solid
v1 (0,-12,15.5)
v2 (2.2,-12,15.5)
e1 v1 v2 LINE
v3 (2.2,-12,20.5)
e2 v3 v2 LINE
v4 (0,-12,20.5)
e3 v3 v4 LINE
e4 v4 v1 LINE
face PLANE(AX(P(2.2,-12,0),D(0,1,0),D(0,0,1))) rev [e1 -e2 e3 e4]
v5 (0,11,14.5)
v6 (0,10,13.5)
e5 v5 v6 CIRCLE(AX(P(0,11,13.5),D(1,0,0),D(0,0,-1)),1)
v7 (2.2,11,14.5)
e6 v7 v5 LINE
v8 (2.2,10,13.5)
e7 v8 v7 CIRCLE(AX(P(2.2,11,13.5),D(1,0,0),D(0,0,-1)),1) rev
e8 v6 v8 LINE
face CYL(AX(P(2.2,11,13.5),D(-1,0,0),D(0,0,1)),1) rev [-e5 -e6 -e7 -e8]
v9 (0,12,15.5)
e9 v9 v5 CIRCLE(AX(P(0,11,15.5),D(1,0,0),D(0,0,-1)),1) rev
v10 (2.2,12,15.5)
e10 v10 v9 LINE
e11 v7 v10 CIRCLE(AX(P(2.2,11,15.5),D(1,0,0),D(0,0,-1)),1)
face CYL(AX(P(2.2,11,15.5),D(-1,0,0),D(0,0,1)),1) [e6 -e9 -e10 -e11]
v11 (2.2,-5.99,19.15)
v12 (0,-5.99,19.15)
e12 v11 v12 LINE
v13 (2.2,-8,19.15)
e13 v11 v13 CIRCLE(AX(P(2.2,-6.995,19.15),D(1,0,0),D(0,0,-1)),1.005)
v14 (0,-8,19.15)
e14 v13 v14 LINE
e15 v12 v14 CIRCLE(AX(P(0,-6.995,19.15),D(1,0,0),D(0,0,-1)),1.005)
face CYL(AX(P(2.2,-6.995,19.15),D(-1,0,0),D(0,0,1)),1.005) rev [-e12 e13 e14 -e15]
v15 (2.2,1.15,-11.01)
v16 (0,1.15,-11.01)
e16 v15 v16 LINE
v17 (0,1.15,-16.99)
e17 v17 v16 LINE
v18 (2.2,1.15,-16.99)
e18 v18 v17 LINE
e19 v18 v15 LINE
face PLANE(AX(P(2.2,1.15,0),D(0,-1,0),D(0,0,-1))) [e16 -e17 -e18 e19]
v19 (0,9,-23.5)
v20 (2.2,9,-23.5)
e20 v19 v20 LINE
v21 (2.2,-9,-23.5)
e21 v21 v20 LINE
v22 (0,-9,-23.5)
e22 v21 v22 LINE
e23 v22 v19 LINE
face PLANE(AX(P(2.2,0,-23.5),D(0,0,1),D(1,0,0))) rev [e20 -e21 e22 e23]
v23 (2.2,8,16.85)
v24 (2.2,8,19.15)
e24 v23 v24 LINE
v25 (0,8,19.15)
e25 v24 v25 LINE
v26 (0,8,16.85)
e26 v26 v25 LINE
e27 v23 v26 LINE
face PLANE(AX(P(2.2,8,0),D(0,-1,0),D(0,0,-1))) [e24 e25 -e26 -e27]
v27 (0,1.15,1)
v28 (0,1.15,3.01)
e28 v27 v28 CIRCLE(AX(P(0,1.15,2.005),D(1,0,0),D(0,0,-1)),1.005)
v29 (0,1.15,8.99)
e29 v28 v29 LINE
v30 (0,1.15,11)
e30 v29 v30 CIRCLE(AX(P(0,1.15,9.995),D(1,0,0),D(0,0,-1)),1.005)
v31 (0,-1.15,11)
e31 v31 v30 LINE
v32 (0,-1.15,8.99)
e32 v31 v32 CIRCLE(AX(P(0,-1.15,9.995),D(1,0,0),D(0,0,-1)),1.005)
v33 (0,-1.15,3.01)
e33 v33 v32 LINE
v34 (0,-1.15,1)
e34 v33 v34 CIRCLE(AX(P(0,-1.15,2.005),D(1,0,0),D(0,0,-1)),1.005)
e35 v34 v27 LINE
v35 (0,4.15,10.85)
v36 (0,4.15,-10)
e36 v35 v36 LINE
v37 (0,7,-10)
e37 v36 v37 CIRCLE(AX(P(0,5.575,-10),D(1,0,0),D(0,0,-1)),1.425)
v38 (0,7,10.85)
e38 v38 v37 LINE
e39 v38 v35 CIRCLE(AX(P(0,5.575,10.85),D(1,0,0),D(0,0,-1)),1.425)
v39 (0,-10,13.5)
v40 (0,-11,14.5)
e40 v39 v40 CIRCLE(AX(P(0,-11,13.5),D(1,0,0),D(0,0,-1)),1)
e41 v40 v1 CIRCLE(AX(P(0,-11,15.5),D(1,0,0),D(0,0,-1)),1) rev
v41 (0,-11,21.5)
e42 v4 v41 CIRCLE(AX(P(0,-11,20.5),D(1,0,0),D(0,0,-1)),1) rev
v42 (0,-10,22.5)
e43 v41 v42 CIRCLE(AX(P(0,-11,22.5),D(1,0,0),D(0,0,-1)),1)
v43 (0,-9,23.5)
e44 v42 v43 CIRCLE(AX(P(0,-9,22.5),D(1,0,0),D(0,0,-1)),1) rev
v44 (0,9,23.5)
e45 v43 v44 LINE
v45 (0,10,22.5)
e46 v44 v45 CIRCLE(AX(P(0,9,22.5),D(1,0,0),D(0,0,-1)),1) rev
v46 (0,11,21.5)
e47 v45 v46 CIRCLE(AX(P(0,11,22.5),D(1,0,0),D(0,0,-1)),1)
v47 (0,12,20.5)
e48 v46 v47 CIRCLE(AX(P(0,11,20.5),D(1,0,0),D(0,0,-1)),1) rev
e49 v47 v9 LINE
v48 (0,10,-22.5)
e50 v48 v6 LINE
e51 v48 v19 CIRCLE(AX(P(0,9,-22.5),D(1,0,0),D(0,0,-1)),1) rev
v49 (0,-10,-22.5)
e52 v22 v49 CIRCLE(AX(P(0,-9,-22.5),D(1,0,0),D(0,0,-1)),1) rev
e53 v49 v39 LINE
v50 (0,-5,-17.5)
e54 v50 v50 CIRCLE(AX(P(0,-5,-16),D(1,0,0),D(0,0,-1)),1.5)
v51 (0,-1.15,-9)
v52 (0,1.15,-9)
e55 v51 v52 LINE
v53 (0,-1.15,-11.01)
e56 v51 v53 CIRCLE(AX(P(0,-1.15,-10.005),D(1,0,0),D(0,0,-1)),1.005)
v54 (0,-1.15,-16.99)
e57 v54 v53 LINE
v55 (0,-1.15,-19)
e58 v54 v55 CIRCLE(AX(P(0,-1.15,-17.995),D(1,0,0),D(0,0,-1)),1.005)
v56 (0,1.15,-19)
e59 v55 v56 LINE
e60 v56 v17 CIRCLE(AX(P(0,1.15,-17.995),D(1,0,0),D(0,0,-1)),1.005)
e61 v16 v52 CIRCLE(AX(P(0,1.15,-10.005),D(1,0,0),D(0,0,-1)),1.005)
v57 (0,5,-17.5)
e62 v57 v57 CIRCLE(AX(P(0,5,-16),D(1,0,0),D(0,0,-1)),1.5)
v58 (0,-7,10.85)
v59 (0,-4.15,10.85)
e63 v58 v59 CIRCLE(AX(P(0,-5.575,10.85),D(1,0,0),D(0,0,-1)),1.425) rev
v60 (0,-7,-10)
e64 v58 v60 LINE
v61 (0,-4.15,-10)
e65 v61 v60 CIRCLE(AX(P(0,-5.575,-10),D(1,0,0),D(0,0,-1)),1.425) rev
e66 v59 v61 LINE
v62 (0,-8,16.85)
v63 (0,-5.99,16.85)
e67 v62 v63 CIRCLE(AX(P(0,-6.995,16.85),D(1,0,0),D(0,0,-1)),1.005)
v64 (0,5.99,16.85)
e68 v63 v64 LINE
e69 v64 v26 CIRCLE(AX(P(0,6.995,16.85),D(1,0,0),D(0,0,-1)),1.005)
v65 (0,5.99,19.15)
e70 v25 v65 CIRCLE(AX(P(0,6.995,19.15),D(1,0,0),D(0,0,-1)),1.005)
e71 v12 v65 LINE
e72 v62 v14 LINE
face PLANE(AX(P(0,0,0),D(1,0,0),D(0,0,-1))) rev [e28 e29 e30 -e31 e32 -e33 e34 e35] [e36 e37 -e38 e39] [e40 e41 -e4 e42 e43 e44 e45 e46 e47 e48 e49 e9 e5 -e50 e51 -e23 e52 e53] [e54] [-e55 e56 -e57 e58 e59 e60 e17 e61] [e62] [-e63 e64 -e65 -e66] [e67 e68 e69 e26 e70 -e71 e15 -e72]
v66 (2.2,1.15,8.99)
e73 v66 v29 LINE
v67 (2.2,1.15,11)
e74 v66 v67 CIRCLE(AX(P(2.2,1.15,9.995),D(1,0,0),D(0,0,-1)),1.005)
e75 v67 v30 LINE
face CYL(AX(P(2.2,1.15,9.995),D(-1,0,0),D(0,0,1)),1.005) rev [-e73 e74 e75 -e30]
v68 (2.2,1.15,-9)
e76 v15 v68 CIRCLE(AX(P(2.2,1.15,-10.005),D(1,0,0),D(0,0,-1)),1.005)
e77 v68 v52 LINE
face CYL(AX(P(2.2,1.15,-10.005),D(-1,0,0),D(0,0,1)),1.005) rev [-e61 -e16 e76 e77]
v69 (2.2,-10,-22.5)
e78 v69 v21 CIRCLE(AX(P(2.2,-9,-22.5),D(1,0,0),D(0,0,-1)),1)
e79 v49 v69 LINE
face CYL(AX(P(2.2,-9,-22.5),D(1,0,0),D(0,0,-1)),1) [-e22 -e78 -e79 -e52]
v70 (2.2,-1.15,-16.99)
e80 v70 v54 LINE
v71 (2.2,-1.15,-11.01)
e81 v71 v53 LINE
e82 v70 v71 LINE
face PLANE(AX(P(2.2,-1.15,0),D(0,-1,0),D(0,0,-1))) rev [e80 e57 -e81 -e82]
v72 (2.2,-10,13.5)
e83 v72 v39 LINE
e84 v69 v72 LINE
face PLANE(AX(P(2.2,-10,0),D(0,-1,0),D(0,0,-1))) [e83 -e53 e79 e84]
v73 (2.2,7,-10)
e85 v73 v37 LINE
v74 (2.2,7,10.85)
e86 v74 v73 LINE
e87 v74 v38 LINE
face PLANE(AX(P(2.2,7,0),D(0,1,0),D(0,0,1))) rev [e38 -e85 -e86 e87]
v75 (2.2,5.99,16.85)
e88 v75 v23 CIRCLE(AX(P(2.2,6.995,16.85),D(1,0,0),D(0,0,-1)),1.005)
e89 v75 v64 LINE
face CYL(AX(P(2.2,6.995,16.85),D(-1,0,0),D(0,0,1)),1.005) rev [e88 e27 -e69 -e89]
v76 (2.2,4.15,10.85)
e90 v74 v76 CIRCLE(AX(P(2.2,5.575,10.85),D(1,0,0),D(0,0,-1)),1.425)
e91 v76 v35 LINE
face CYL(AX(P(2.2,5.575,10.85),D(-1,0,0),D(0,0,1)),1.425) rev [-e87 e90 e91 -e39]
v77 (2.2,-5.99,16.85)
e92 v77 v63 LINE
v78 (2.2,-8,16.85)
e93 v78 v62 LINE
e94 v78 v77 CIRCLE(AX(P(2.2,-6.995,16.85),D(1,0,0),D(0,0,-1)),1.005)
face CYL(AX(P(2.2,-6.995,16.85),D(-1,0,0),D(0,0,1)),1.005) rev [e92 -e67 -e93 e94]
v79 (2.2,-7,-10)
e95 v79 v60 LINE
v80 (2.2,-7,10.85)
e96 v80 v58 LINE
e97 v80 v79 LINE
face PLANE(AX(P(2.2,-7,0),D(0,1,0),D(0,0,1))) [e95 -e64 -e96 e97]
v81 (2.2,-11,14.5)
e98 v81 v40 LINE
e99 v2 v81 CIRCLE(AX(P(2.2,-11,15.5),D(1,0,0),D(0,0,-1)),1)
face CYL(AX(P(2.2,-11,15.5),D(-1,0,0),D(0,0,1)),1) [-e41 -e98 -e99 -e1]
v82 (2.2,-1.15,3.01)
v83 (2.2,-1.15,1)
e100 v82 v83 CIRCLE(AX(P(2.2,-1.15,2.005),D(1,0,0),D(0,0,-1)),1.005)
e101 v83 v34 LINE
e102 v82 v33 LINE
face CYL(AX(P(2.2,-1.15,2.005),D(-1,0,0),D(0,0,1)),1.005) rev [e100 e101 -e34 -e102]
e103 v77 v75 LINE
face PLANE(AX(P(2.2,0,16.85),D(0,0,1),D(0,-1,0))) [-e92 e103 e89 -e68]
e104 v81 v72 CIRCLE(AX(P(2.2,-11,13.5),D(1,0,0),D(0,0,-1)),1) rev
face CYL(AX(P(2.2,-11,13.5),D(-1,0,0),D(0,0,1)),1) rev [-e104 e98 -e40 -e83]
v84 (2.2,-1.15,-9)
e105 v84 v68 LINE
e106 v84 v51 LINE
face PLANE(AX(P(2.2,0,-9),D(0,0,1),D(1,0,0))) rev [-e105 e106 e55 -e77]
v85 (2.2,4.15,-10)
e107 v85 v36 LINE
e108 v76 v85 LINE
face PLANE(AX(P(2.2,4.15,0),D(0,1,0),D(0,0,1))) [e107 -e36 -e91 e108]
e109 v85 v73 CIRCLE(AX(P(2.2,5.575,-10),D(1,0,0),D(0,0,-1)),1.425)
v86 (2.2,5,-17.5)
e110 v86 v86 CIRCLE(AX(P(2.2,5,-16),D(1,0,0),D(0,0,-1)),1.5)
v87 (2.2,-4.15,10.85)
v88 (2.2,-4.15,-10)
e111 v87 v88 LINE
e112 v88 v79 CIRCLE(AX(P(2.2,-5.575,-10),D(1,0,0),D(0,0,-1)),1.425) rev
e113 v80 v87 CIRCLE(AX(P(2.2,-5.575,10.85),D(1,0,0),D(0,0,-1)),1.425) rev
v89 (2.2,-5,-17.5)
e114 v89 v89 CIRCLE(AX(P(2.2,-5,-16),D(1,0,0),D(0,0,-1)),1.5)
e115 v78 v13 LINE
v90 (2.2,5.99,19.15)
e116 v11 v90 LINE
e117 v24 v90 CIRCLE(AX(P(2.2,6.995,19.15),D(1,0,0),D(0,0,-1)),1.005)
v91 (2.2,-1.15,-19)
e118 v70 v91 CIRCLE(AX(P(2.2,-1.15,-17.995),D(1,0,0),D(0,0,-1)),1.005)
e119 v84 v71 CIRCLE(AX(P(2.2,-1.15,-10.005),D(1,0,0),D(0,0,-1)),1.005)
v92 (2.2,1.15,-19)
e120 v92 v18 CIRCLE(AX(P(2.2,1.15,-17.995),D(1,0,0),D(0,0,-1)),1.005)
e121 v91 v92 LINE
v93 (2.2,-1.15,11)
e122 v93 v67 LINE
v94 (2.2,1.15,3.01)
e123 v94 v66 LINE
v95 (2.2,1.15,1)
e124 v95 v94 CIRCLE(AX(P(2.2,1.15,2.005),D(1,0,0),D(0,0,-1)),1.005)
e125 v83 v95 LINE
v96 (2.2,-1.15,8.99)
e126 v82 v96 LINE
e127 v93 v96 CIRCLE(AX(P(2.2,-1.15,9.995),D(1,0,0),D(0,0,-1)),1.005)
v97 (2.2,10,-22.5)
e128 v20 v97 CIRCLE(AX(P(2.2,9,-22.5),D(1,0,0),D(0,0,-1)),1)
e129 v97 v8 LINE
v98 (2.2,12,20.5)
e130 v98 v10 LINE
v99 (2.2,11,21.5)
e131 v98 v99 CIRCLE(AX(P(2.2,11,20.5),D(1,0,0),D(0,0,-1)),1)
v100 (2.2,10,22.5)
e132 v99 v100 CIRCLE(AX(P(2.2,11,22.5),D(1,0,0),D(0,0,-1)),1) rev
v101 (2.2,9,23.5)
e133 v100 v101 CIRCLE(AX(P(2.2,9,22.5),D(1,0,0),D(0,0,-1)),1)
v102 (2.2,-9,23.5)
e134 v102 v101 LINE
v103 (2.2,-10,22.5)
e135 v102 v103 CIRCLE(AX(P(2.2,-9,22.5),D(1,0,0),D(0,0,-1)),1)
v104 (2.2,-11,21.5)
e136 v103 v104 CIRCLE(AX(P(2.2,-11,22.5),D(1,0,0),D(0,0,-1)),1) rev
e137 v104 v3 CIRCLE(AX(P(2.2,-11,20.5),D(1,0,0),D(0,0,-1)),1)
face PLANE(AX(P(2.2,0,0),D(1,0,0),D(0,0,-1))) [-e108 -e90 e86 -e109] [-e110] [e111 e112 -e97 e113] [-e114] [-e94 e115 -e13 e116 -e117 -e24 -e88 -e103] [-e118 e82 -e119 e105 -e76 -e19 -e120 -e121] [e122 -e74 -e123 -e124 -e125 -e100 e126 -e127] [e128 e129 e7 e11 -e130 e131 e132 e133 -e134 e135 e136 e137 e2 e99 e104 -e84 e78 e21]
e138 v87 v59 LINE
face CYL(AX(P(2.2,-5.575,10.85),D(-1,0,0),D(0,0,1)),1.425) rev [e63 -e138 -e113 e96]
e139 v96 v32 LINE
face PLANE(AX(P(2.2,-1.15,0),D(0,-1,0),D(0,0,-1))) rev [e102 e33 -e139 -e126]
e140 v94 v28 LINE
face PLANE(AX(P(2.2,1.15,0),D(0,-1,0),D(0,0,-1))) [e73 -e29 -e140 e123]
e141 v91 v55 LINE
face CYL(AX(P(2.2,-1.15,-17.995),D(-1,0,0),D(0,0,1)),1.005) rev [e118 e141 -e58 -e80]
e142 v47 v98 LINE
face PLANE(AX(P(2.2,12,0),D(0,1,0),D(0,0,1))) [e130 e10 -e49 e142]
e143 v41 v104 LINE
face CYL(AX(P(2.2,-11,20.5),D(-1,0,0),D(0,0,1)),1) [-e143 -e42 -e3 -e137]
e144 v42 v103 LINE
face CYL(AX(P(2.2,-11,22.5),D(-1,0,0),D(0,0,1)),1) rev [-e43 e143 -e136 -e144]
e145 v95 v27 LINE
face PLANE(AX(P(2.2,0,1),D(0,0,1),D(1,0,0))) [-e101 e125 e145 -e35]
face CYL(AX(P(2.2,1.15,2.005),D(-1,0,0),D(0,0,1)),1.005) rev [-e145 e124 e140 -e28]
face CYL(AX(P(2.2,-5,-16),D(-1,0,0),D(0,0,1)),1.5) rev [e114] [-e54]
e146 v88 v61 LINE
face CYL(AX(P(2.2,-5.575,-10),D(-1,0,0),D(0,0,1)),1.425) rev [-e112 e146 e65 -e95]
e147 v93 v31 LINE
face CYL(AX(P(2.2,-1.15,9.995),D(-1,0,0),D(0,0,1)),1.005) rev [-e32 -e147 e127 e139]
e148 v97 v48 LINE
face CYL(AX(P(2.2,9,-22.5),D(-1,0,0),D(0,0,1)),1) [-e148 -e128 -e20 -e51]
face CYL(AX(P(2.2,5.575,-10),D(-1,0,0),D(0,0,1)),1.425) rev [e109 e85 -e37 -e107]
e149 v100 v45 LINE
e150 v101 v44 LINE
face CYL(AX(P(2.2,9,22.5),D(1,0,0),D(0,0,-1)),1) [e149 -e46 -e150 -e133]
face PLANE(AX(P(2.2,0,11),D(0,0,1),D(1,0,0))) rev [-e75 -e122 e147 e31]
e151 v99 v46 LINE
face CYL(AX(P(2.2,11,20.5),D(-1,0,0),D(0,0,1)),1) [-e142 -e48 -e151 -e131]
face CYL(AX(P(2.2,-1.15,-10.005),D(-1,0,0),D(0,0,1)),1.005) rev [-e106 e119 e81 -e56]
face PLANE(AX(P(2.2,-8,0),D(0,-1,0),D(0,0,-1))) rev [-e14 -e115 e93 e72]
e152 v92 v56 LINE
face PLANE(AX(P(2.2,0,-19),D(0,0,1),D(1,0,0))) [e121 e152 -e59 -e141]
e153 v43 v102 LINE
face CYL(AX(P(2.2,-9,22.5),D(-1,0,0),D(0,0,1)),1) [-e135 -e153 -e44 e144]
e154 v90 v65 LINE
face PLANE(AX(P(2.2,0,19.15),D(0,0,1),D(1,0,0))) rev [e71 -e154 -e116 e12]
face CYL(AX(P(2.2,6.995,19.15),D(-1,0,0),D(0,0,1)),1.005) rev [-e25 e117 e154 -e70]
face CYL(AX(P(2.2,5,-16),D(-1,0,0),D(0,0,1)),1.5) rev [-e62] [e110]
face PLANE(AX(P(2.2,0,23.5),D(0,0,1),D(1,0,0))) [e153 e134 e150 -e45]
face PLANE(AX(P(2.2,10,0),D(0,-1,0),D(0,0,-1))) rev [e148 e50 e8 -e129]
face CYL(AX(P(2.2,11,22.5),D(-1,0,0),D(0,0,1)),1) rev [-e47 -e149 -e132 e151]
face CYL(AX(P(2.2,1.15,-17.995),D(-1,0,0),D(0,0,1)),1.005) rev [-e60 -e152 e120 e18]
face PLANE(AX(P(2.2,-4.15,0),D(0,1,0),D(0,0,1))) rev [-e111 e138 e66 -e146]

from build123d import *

# Parameters (mm, degrees)
SKETCH_1_R      = 1.5
EXTRUDE_1_DEPTH = 2.2
FILLET_1_R      = 1


with BuildPart() as part:
    # 草图1 → 凸台-拉伸1 (new body)
    with BuildSketch(Plane(origin=(0, 0, 0), x_dir=(0, 0, -1), z_dir=(1, 0, 0))):
        Polygon((-14.5, -10), (23.5, -10), (23.5, 10), (-14.5, 10), (-14.5, 12), (-21.5, 12), (-21.5, 10), (-23.5, 10), (-23.5, -10), (-21.5, -10), (-21.5, -12), (-14.5, -12), align=None)
        with BuildLine():
            ThreePointArc((-15.845, -6.995), (-16.139357685, -7.705642315), (-16.85, -8))
            Line((-16.85, -8), (-19.15, -8))
            ThreePointArc((-19.15, -8), (-20.155, -6.995), (-19.15, -5.99))
            Line((-19.15, -5.99), (-19.15, 5.99))
            ThreePointArc((-19.15, 5.99), (-20.155, 6.995), (-19.15, 8))
            Line((-19.15, 8), (-16.85, 8))
            ThreePointArc((-16.85, 8), (-16.139357685, 7.705642315), (-15.845, 6.995))
            ThreePointArc((-15.845, 6.995), (-16.139357685, 6.284357685), (-16.85, 5.99))
            Line((-16.85, 5.99), (-16.85, -5.99))
            ThreePointArc((-16.85, -5.99), (-16.139357685, -6.284357685), (-15.845, -6.995))
        make_face(mode=Mode.SUBTRACT)
        with BuildLine():
            Line((10, -7), (-10.85, -7))
            ThreePointArc((-10.85, -7), (-12.275, -5.575), (-10.85, -4.15))
            Line((-10.85, -4.15), (10, -4.15))
            ThreePointArc((10, -4.15), (11.425, -5.575), (10, -7))
        make_face(mode=Mode.SUBTRACT)
        with BuildLine():
            Line((-3.01, -1.15), (-8.99, -1.15))
            ThreePointArc((-8.99, -1.15), (-9.995, -2.155), (-11, -1.15))
            Line((-11, -1.15), (-11, 1.15))
            ThreePointArc((-11, 1.15), (-9.995, 2.155), (-8.99, 1.15))
            Line((-8.99, 1.15), (-3.01, 1.15))
            ThreePointArc((-3.01, 1.15), (-2.005, 2.155), (-1, 1.15))
            Line((-1, 1.15), (-1, -1.15))
            ThreePointArc((-1, -1.15), (-2.005, -2.155), (-3.01, -1.15))
        make_face(mode=Mode.SUBTRACT)
        with Locations((16, -5)):
            Circle(SKETCH_1_R, mode=Mode.SUBTRACT)
        with BuildLine():
            ThreePointArc((-10.85, 4.15), (-12.275, 5.575), (-10.85, 7))
            Line((-10.85, 7), (10, 7))
            ThreePointArc((10, 7), (11.425, 5.575), (10, 4.15))
            Line((10, 4.15), (-10.85, 4.15))
        make_face(mode=Mode.SUBTRACT)
        with BuildLine():
            Line((16.99, -1.15), (11.01, -1.15))
            ThreePointArc((11.01, -1.15), (10.005, -2.155), (9, -1.15))
            Line((9, -1.15), (9, 1.15))
            ThreePointArc((9, 1.15), (10.005, 2.155), (11.01, 1.15))
            Line((11.01, 1.15), (16.99, 1.15))
            ThreePointArc((16.99, 1.15), (17.995, 2.155), (19, 1.15))
            Line((19, 1.15), (19, -1.15))
            ThreePointArc((19, -1.15), (17.995, -2.155), (16.99, -1.15))
        make_face(mode=Mode.SUBTRACT)
        with Locations((16, 5)):
            Circle(SKETCH_1_R, mode=Mode.SUBTRACT)
    extrude(amount=EXTRUDE_1_DEPTH)

    # 圆角1
    fillet_1_edges = [part.edges().sort_by_distance(p)[0] for p in [
        (1.1, -10, 23.5),
        (1.1, 10, 23.5),
        (1.1, 12, 14.5),
        (1.1, 10, 14.5),
        (1.1, 10, -23.5),
        (1.1, -10, -23.5),
        (1.1, -10, 14.5),
        (1.1, -12, 14.5),
        (1.1, -12, 21.5),
        (1.1, -10, 21.5),
        (1.1, 12, 21.5),
        (1.1, 10, 21.5),
    ]]
    fillet(fillet_1_edges, radius=FILLET_1_R - 0.0001)  # a hair under: the kernel refuses the full size


solid = part.part
